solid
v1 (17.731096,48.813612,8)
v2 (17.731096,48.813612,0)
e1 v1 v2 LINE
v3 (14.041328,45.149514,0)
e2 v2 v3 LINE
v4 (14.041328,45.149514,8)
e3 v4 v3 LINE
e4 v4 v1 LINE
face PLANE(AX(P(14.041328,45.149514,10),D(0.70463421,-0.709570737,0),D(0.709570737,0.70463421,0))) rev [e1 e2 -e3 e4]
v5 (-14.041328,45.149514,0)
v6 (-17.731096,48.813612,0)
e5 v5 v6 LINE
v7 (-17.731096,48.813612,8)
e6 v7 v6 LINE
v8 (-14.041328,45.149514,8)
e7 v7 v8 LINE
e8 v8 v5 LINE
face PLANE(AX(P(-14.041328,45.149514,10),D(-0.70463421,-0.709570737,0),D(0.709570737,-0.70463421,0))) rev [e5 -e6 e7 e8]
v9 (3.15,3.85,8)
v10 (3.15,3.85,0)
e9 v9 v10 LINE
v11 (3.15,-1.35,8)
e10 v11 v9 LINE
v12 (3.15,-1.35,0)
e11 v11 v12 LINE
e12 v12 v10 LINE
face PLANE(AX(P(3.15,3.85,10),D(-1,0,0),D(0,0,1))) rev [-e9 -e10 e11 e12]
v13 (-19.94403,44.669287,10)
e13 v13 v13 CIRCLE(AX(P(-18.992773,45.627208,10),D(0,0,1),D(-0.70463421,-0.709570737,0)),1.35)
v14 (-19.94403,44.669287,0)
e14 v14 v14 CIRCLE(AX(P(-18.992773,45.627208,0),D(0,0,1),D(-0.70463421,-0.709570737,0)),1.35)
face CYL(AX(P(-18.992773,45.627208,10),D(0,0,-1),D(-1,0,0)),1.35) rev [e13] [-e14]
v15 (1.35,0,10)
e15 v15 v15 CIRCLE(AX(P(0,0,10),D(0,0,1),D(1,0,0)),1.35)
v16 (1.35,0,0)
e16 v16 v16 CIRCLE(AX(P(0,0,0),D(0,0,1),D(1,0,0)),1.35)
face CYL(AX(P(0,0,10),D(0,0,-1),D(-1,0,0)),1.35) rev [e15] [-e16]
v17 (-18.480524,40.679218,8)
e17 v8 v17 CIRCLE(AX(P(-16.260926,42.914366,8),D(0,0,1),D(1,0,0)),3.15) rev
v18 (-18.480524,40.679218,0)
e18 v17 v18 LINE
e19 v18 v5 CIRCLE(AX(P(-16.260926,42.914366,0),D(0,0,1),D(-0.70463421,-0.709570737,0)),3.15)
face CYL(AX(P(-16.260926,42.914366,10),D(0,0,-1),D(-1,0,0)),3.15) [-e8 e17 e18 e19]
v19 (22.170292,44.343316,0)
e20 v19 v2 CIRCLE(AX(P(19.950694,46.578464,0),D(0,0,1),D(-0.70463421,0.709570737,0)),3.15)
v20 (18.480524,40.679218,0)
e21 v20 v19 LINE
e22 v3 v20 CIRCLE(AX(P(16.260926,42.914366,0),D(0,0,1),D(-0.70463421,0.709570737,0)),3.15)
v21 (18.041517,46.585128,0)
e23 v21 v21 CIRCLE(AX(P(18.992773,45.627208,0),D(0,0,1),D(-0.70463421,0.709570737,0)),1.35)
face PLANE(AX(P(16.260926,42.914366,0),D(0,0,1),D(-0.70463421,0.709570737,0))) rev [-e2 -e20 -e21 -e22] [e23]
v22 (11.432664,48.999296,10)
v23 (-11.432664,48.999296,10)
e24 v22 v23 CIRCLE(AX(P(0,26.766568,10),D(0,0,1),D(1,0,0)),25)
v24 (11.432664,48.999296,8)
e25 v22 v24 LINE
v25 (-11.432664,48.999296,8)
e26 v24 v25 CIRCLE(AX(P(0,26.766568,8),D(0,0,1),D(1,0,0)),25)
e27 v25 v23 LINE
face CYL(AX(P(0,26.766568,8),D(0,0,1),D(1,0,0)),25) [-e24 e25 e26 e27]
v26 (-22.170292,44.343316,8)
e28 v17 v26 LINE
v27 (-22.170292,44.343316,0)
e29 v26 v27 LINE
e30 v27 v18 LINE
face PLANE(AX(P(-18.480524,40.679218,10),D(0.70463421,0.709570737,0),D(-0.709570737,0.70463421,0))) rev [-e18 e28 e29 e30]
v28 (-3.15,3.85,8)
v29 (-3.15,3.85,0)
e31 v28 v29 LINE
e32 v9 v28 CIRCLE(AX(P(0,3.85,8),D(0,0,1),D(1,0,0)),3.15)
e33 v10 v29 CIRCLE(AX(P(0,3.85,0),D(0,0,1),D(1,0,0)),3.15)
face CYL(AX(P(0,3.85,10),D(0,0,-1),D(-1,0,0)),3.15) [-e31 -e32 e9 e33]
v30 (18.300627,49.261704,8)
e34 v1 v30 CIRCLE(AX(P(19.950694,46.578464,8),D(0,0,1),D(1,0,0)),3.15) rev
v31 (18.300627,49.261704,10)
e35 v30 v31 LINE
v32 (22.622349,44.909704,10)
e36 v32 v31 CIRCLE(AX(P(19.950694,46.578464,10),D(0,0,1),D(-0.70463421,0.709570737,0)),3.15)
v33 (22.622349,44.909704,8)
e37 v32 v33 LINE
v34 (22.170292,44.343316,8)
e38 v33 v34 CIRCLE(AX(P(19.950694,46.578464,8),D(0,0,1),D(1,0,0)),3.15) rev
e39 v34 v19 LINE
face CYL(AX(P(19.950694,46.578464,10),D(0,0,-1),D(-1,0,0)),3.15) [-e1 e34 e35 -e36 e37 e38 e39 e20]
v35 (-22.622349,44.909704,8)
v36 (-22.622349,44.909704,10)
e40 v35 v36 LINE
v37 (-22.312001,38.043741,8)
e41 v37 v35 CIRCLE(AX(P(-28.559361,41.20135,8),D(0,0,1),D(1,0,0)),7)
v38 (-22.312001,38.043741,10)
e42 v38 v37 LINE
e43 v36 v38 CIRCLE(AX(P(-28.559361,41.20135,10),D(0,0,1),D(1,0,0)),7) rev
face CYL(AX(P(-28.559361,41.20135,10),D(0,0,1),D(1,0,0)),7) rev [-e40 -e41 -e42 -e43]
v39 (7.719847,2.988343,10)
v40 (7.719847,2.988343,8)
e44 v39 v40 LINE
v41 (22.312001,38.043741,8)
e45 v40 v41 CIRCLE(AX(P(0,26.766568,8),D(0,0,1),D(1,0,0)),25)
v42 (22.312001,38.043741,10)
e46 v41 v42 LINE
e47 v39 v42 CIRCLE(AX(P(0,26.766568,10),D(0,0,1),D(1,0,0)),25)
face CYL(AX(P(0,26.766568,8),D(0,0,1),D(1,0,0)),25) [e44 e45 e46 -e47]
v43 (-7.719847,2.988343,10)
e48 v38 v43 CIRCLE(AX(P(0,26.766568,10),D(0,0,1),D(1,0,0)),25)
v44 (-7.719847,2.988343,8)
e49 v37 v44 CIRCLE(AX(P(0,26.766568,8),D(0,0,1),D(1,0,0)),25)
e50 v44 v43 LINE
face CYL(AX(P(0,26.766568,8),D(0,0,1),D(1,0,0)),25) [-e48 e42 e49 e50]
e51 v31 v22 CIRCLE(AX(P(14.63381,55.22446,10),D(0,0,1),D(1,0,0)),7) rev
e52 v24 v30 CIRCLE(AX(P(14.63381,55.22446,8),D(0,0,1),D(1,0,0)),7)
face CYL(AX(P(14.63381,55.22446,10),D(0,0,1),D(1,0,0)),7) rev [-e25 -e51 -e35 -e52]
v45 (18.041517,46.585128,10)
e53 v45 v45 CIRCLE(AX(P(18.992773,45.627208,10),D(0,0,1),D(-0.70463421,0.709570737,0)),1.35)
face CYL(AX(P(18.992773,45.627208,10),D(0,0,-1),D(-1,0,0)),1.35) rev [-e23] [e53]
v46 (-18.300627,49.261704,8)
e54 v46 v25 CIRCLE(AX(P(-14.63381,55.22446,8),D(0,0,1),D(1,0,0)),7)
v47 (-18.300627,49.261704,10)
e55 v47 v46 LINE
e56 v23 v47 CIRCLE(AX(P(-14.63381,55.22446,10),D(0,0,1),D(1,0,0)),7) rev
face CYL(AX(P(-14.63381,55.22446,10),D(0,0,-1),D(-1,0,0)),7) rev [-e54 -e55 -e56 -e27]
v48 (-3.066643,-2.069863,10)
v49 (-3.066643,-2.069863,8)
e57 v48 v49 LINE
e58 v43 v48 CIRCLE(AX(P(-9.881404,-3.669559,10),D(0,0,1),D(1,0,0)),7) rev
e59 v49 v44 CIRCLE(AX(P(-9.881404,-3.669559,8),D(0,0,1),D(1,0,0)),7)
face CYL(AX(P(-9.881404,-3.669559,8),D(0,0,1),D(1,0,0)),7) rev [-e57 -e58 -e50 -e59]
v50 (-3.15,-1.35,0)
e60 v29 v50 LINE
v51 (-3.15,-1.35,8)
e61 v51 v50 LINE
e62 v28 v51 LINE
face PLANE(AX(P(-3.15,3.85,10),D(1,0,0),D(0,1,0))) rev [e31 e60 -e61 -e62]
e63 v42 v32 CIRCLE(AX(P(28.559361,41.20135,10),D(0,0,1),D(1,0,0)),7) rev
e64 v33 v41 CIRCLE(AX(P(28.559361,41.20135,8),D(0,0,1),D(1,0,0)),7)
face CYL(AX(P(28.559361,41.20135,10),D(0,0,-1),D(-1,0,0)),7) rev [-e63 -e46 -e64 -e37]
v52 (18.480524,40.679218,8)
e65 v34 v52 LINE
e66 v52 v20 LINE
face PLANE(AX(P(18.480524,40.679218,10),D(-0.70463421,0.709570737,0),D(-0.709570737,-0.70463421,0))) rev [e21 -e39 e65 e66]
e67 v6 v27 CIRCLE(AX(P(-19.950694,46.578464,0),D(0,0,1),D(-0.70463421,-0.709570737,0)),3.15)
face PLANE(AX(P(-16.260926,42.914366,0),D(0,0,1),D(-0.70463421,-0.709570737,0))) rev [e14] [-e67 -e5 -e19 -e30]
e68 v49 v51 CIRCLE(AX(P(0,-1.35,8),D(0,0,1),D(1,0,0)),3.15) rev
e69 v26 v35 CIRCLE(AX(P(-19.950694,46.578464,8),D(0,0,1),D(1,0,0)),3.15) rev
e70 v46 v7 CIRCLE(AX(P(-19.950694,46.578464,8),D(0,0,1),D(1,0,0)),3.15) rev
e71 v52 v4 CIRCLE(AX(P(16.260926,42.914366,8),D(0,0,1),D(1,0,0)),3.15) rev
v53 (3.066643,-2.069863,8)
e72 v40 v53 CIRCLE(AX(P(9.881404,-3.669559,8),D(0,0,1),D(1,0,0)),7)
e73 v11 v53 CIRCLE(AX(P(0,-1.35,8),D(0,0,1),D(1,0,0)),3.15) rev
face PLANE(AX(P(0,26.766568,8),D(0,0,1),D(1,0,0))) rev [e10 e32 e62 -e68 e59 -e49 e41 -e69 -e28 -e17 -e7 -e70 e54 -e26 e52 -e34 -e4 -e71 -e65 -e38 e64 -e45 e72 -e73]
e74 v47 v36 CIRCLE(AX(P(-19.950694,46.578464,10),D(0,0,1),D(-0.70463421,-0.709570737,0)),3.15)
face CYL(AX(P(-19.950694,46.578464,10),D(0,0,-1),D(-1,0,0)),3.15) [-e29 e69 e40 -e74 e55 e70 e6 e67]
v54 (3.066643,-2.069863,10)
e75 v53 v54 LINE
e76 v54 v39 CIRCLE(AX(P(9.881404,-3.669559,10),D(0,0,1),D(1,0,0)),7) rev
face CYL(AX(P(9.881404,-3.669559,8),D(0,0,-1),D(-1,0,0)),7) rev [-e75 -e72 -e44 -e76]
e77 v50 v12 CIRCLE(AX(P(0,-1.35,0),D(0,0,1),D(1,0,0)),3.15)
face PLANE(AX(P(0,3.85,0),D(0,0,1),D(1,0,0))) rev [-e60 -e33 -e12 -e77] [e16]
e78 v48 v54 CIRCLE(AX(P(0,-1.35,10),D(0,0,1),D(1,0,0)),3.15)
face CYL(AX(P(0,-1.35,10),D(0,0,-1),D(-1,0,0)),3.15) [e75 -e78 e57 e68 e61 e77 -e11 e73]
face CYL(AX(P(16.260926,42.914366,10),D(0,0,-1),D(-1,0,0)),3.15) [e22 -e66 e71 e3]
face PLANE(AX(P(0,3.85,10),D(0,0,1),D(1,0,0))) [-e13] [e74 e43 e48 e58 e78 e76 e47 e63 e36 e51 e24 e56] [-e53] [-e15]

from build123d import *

# Parameters (mm, degrees)
SKETCH1_R           = 1.35
BOSS_EXTRUDE1_DEPTH = 10
SKETCH2_R           = 25
BOSS_EXTRUDE2_DEPTH = 2
CIRPATTERN1_COUNT   = 2
CIRPATTERN1_ANGLE   = 134.8
CIRPATTERN2_COUNT   = 2
CIRPATTERN2_ANGLE   = 225.2
FILLET1_R           = 7


with BuildPart() as part:
    # Sketch1 → Boss-Extrude1 (new body)
    with BuildSketch(Plane.XY):
        with BuildLine():
            Line((3.15, 3.85), (3.15, -1.35))
            ThreePointArc((3.15, -1.35), (0, -4.5), (-3.15, -1.35))
            Line((-3.15, -1.35), (-3.15, 3.85))
            ThreePointArc((-3.15, 3.85), (0, 7), (3.15, 3.85))
        make_face()
        Circle(SKETCH1_R, mode=Mode.SUBTRACT)
    boss_extrude1 = extrude(amount=BOSS_EXTRUDE1_DEPTH)

    # Sketch2 → Boss-Extrude2 (add)
    with BuildSketch(Plane.XY.offset(10)):
        with Locations((0, 26.766568047)):
            Circle(SKETCH2_R)
    extrude(amount=-BOSS_EXTRUDE2_DEPTH)

    # CirPattern1: Boss-Extrude1 ×2 about axis
    cirpattern1_axis = Axis((0, 26.766568047, 0), (0, 0, 1))
    for i in range(1, CIRPATTERN1_COUNT):
        add(boss_extrude1.rotate(cirpattern1_axis, i * CIRPATTERN1_ANGLE / (CIRPATTERN1_COUNT - 1)))

    # CirPattern2: Boss-Extrude1 ×2 about axis
    cirpattern2_axis = Axis((0, 26.766568047, 0), (0, 0, 1))
    for i in range(1, CIRPATTERN2_COUNT):
        add(boss_extrude1.rotate(cirpattern2_axis, i * CIRPATTERN2_ANGLE / (CIRPATTERN2_COUNT - 1)))

    # Fillet1
    # the kernel refuses this fillet: 7 mm, written as the material it adds along each edge
    with BuildSketch(Plane(origin=(-19.817488489, 42.006881364, 8), x_dir=(-0.53269115848809, -0.8463097126162599, 0), z_dir=(0, 0, 1))) as fillet1_piece_1:
        with BuildLine():
            CenterArc((5.338447362, -6.96923168), FILLET1_R, 95.374025281, 58.803015478)
            Line((-0.962562709, -3.920088835), (-1.592663716, -3.61517455))
            ThreePointArc((-1.592663716, -3.61517455), (-1.407138142, -3.082948514), (-0.683108314, 0.152849703))
            Line((-0.683108314, 0.152849703), (0.06555988, 0.696923168))
            ThreePointArc((0.06555988, 0.696923168), (2.341424281, 0.590113144), (4.617288683, 0.696923168))
            Line((4.617288683, 0.696923168), (4.682848563, 0))
        make_face()
    extrude(amount=2)
    with BuildSketch(Plane(origin=(-15.378292966, 46.477177004, 8), x_dir=(0.8425702330097088, 0.5385864855767968, 0), z_dir=(0, 0, 1)), Plane(origin=(19.817488489, 42.006881364, 8), x_dir=(0.532691158488102, -0.8463097126162524, 0), z_dir=(0, 0, 1))) as fillet1_piece_2:
        with BuildLine():
            CenterArc((5.338447362, 6.96923168), FILLET1_R, 205.822959241, 58.803015478)
            Line((-0.962562709, 3.920088835), (-1.592663716, 3.61517455))
            ThreePointArc((-1.592663716, 3.61517455), (-1.407138142, 3.082948514), (-0.683108314, -0.152849703))
            Line((-0.683108314, -0.152849703), (0.06555988, -0.696923168))
            ThreePointArc((0.06555988, -0.696923168), (2.341424281, -0.590113144), (4.617288683, -0.696923168))
            Line((4.617288683, -0.696923168), (4.682848563, 0))
        make_face()
    extrude(amount=2)
    with BuildSketch(Plane(origin=(15.378292966, 46.477177004, 8), x_dir=(0.7239706283099918, 0.6898307976195582, 0), z_dir=(0, 0, 1)), Plane(origin=(3.15, 1.96581201, 8), x_dir=(-0.020650724563576823, -0.9997867510499423, 0), z_dir=(0, 0, 1))) as fillet1_piece_3:
        with BuildLine():
            CenterArc((5.495161337, 6.846342989), FILLET1_R, 199.169842212, 58.803015478)
            Line((-1.116684038, 4.547756306), (-1.777868575, 4.317897638))
            ThreePointArc((-1.777868575, 4.317897638), (-1.131431398, 2.133158264), (-0.692451691, -0.102521492))
            Line((-0.692451691, -0.102521492), (0.014455507, -0.699850726))
            ThreePointArc((0.014455507, -0.699850726), (3.329560424, -0.631376805), (3.890673543, -0.684634299))
            Line((3.890673543, -0.684634299), (4.03653607, 0))
        make_face()
    extrude(amount=2)
    with BuildSketch(Plane(origin=(-3.15, 1.96581201, 8), x_dir=(0.020650724563576386, -0.9997867510499423, 0), z_dir=(0, 0, 1))) as fillet1_piece_4:
        with BuildLine():
            CenterArc((5.495161337, -6.846342989), FILLET1_R, 102.02714231, 58.803015478)
            Line((-1.116684038, -4.547756306), (-1.777868575, -4.317897638))
            ThreePointArc((-1.777868575, -4.317897638), (-1.131431398, -2.133158264), (-0.692451691, 0.102521492))
            Line((-0.692451691, 0.102521492), (0.014455507, 0.699850726))
            ThreePointArc((0.014455507, 0.699850726), (3.329560424, 0.631376805), (3.890673543, 0.684634299))
            Line((3.890673543, 0.684634299), (4.03653607, 0))
        make_face()
    extrude(amount=2)


solid = part.part
